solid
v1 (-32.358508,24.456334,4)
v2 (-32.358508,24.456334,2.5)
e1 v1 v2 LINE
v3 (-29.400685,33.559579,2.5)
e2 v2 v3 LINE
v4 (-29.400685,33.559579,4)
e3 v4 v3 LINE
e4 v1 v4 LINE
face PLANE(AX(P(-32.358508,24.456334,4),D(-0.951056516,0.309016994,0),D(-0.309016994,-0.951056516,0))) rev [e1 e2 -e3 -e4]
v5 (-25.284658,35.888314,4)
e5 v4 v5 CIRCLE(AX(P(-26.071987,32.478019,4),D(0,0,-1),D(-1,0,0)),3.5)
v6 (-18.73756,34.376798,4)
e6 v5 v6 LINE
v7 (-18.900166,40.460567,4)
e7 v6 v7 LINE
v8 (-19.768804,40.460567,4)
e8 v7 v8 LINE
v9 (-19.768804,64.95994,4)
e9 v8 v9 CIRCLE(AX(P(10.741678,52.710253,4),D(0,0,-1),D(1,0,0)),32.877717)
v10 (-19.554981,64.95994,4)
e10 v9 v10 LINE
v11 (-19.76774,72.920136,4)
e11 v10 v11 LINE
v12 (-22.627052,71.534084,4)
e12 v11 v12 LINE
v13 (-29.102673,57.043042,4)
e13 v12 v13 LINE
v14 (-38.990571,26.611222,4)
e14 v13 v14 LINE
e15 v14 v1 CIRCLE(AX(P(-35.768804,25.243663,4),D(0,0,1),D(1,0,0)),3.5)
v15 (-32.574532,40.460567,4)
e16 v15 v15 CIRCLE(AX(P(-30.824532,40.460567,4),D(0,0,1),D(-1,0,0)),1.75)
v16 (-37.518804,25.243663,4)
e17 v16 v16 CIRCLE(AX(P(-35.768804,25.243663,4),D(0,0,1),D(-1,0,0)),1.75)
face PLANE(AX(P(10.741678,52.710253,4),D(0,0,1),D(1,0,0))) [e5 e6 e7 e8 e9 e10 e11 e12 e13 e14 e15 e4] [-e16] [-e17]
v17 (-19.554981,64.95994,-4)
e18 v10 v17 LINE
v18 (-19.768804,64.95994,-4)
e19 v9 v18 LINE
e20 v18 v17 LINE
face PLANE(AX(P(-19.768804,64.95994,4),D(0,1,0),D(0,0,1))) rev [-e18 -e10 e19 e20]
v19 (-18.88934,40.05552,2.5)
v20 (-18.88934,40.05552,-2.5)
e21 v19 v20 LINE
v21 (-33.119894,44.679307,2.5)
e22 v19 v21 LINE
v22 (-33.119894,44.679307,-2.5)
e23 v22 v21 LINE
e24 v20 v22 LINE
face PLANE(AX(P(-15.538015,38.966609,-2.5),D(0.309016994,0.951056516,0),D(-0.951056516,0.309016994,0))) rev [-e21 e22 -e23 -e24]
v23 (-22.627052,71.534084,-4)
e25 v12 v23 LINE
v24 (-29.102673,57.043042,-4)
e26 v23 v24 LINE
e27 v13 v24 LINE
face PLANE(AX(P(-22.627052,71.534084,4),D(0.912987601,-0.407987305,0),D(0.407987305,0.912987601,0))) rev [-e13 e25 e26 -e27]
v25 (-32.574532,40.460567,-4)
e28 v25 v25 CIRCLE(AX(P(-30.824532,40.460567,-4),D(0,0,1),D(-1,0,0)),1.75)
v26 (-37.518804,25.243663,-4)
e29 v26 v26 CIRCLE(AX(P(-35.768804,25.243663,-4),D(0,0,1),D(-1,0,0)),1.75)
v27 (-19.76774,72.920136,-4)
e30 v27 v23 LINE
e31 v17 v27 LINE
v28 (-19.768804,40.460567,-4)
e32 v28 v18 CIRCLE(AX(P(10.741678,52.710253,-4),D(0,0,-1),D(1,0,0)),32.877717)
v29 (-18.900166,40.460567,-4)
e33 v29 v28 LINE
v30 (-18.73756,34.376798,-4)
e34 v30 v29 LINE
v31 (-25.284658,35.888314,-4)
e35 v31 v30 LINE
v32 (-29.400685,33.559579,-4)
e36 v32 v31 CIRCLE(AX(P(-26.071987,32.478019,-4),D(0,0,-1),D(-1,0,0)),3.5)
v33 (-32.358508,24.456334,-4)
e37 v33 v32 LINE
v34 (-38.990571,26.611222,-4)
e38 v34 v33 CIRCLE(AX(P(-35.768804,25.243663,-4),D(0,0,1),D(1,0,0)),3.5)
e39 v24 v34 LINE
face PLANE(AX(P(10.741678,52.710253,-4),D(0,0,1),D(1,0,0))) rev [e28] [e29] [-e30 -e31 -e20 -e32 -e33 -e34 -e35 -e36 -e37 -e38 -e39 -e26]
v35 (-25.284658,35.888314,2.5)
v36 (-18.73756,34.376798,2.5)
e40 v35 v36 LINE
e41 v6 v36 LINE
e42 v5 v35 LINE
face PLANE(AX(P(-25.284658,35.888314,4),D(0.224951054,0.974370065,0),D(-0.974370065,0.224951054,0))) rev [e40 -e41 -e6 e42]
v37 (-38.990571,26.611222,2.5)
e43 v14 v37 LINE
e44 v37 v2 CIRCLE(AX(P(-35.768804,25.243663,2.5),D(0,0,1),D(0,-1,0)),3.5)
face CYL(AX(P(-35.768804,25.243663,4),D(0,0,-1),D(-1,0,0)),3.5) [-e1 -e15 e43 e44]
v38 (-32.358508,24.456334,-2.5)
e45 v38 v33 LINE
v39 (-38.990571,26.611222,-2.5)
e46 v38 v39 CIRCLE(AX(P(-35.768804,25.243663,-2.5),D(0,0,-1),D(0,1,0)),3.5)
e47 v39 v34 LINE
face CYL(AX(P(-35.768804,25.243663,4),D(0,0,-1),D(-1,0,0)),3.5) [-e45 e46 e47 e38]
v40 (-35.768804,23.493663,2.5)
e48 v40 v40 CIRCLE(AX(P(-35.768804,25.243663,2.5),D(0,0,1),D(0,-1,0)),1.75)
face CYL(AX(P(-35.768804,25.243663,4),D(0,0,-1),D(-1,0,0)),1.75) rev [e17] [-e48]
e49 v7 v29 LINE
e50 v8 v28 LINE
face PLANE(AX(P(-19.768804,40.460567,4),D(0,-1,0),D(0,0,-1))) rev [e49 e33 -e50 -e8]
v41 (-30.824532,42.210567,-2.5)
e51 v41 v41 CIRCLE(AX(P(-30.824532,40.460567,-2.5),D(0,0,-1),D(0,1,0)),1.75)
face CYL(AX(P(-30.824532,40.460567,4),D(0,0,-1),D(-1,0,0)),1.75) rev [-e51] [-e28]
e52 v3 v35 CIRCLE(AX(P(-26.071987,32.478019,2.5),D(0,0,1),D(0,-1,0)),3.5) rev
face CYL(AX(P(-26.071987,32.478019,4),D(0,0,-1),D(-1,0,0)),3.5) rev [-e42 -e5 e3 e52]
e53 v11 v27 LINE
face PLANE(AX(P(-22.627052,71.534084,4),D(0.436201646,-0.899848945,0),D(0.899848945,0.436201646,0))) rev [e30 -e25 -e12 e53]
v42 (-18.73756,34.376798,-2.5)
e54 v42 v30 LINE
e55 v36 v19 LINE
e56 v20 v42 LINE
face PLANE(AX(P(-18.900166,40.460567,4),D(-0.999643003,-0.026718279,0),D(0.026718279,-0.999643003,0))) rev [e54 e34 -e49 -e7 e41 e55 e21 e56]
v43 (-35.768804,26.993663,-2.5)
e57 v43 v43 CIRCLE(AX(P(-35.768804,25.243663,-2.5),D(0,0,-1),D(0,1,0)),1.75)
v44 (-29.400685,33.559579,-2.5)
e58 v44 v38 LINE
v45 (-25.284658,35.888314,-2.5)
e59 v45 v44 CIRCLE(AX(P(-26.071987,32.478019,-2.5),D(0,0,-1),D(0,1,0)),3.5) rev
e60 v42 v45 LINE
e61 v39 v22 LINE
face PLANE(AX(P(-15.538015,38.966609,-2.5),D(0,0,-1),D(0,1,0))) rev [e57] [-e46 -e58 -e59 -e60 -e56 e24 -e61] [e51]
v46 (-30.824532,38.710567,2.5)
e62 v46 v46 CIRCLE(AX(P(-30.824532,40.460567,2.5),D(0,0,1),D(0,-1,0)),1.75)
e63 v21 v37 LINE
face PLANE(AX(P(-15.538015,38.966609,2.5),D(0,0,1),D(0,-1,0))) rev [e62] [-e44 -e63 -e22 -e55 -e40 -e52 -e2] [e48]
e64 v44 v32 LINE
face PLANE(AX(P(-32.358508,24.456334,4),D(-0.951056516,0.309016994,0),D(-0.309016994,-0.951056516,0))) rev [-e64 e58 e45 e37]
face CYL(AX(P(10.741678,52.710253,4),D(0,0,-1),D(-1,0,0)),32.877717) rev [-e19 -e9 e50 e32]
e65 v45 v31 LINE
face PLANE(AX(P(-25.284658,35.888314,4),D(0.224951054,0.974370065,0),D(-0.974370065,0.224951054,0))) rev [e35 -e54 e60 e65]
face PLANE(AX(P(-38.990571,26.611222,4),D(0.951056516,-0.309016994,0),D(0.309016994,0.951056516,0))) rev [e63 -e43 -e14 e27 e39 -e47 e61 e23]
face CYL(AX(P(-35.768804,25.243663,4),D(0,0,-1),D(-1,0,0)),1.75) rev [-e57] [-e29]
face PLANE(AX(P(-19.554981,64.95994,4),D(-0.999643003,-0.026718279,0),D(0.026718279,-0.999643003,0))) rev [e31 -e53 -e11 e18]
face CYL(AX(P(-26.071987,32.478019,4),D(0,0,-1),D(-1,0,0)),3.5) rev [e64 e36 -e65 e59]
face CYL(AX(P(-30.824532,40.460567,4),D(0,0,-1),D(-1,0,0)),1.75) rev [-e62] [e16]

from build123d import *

# Parameters (mm, degrees)
ESTRUSIONE_ESTRUSIONE1_START     = -4
ESTRUSIONE_ESTRUSIONE1_OUTLINE_R = 1.75
ESTRUSIONE_ESTRUSIONE1_DEPTH     = 8
SCHIZZO2_W                       = 5
SCHIZZO2_H                       = 30
TAGLIO_ESTRUSIONE1_DEPTH         = 15


# Read off the part's stored shape, not the designer's step: Estrusione-Estrusione1
with BuildPart() as part:
    # Estrusione-Estrusione1 outline → Estrusione-Estrusione1 (new body)
    with BuildSketch(Plane.XY.offset(ESTRUSIONE_ESTRUSIONE1_START)):
        with BuildLine():
            Line((-25.284658439, 35.888314388), (-18.737560358, 34.376797697))
            Line((-18.737560358, 34.376797697), (-18.90016625, 40.460566904))
            Line((-18.90016625, 40.460566904), (-19.768803662, 40.460566904))
            ThreePointArc((-19.768803662, 40.460566904), (-22.136039573, 52.710253398), (-19.768803662, 64.959939892))
            Line((-19.768803662, 64.959939892), (-19.554981097, 64.959939892))
            Line((-19.554981097, 64.959939892), (-19.767739779, 72.920135539))
            Line((-19.767739779, 72.920135539), (-22.627052267, 71.534084223))
            Line((-22.627052267, 71.534084223), (-29.102672814, 57.04304198))
            Line((-29.102672814, 57.04304198), (-38.990570649, 26.611221593))
            ThreePointArc((-38.990570649, 26.611221593), (-36.850363143, 21.914964836), (-32.358508436, 24.456333953))
            Line((-32.358508436, 24.456333953), (-29.400684937, 33.559578642))
            ThreePointArc((-29.400684937, 33.559578642), (-27.79546959, 35.524264097), (-25.284658439, 35.888314388))
        make_face()
        with Locations((-35.768803662, 25.243662643)):
            Circle(ESTRUSIONE_ESTRUSIONE1_OUTLINE_R, mode=Mode.SUBTRACT)
        with Locations((-30.824531752, 40.460566904)):
            Circle(ESTRUSIONE_ESTRUSIONE1_OUTLINE_R, mode=Mode.SUBTRACT)
    extrude(amount=ESTRUSIONE_ESTRUSIONE1_DEPTH)

    # Schizzo2 → Taglio-Estrusione1 (cut, symmetric)
    with BuildSketch(Plane(origin=(-39.772113155, 12.922742925, 0), x_dir=(0, 0, 1), z_dir=(-0.9510565162951534, 0.3090169943749484, 0))):
        with Locations((0, 17.257936303)):
            Rectangle(SCHIZZO2_W, SCHIZZO2_H)
    extrude(amount=TAGLIO_ESTRUSIONE1_DEPTH, both=True, mode=Mode.SUBTRACT)


solid = part.part
